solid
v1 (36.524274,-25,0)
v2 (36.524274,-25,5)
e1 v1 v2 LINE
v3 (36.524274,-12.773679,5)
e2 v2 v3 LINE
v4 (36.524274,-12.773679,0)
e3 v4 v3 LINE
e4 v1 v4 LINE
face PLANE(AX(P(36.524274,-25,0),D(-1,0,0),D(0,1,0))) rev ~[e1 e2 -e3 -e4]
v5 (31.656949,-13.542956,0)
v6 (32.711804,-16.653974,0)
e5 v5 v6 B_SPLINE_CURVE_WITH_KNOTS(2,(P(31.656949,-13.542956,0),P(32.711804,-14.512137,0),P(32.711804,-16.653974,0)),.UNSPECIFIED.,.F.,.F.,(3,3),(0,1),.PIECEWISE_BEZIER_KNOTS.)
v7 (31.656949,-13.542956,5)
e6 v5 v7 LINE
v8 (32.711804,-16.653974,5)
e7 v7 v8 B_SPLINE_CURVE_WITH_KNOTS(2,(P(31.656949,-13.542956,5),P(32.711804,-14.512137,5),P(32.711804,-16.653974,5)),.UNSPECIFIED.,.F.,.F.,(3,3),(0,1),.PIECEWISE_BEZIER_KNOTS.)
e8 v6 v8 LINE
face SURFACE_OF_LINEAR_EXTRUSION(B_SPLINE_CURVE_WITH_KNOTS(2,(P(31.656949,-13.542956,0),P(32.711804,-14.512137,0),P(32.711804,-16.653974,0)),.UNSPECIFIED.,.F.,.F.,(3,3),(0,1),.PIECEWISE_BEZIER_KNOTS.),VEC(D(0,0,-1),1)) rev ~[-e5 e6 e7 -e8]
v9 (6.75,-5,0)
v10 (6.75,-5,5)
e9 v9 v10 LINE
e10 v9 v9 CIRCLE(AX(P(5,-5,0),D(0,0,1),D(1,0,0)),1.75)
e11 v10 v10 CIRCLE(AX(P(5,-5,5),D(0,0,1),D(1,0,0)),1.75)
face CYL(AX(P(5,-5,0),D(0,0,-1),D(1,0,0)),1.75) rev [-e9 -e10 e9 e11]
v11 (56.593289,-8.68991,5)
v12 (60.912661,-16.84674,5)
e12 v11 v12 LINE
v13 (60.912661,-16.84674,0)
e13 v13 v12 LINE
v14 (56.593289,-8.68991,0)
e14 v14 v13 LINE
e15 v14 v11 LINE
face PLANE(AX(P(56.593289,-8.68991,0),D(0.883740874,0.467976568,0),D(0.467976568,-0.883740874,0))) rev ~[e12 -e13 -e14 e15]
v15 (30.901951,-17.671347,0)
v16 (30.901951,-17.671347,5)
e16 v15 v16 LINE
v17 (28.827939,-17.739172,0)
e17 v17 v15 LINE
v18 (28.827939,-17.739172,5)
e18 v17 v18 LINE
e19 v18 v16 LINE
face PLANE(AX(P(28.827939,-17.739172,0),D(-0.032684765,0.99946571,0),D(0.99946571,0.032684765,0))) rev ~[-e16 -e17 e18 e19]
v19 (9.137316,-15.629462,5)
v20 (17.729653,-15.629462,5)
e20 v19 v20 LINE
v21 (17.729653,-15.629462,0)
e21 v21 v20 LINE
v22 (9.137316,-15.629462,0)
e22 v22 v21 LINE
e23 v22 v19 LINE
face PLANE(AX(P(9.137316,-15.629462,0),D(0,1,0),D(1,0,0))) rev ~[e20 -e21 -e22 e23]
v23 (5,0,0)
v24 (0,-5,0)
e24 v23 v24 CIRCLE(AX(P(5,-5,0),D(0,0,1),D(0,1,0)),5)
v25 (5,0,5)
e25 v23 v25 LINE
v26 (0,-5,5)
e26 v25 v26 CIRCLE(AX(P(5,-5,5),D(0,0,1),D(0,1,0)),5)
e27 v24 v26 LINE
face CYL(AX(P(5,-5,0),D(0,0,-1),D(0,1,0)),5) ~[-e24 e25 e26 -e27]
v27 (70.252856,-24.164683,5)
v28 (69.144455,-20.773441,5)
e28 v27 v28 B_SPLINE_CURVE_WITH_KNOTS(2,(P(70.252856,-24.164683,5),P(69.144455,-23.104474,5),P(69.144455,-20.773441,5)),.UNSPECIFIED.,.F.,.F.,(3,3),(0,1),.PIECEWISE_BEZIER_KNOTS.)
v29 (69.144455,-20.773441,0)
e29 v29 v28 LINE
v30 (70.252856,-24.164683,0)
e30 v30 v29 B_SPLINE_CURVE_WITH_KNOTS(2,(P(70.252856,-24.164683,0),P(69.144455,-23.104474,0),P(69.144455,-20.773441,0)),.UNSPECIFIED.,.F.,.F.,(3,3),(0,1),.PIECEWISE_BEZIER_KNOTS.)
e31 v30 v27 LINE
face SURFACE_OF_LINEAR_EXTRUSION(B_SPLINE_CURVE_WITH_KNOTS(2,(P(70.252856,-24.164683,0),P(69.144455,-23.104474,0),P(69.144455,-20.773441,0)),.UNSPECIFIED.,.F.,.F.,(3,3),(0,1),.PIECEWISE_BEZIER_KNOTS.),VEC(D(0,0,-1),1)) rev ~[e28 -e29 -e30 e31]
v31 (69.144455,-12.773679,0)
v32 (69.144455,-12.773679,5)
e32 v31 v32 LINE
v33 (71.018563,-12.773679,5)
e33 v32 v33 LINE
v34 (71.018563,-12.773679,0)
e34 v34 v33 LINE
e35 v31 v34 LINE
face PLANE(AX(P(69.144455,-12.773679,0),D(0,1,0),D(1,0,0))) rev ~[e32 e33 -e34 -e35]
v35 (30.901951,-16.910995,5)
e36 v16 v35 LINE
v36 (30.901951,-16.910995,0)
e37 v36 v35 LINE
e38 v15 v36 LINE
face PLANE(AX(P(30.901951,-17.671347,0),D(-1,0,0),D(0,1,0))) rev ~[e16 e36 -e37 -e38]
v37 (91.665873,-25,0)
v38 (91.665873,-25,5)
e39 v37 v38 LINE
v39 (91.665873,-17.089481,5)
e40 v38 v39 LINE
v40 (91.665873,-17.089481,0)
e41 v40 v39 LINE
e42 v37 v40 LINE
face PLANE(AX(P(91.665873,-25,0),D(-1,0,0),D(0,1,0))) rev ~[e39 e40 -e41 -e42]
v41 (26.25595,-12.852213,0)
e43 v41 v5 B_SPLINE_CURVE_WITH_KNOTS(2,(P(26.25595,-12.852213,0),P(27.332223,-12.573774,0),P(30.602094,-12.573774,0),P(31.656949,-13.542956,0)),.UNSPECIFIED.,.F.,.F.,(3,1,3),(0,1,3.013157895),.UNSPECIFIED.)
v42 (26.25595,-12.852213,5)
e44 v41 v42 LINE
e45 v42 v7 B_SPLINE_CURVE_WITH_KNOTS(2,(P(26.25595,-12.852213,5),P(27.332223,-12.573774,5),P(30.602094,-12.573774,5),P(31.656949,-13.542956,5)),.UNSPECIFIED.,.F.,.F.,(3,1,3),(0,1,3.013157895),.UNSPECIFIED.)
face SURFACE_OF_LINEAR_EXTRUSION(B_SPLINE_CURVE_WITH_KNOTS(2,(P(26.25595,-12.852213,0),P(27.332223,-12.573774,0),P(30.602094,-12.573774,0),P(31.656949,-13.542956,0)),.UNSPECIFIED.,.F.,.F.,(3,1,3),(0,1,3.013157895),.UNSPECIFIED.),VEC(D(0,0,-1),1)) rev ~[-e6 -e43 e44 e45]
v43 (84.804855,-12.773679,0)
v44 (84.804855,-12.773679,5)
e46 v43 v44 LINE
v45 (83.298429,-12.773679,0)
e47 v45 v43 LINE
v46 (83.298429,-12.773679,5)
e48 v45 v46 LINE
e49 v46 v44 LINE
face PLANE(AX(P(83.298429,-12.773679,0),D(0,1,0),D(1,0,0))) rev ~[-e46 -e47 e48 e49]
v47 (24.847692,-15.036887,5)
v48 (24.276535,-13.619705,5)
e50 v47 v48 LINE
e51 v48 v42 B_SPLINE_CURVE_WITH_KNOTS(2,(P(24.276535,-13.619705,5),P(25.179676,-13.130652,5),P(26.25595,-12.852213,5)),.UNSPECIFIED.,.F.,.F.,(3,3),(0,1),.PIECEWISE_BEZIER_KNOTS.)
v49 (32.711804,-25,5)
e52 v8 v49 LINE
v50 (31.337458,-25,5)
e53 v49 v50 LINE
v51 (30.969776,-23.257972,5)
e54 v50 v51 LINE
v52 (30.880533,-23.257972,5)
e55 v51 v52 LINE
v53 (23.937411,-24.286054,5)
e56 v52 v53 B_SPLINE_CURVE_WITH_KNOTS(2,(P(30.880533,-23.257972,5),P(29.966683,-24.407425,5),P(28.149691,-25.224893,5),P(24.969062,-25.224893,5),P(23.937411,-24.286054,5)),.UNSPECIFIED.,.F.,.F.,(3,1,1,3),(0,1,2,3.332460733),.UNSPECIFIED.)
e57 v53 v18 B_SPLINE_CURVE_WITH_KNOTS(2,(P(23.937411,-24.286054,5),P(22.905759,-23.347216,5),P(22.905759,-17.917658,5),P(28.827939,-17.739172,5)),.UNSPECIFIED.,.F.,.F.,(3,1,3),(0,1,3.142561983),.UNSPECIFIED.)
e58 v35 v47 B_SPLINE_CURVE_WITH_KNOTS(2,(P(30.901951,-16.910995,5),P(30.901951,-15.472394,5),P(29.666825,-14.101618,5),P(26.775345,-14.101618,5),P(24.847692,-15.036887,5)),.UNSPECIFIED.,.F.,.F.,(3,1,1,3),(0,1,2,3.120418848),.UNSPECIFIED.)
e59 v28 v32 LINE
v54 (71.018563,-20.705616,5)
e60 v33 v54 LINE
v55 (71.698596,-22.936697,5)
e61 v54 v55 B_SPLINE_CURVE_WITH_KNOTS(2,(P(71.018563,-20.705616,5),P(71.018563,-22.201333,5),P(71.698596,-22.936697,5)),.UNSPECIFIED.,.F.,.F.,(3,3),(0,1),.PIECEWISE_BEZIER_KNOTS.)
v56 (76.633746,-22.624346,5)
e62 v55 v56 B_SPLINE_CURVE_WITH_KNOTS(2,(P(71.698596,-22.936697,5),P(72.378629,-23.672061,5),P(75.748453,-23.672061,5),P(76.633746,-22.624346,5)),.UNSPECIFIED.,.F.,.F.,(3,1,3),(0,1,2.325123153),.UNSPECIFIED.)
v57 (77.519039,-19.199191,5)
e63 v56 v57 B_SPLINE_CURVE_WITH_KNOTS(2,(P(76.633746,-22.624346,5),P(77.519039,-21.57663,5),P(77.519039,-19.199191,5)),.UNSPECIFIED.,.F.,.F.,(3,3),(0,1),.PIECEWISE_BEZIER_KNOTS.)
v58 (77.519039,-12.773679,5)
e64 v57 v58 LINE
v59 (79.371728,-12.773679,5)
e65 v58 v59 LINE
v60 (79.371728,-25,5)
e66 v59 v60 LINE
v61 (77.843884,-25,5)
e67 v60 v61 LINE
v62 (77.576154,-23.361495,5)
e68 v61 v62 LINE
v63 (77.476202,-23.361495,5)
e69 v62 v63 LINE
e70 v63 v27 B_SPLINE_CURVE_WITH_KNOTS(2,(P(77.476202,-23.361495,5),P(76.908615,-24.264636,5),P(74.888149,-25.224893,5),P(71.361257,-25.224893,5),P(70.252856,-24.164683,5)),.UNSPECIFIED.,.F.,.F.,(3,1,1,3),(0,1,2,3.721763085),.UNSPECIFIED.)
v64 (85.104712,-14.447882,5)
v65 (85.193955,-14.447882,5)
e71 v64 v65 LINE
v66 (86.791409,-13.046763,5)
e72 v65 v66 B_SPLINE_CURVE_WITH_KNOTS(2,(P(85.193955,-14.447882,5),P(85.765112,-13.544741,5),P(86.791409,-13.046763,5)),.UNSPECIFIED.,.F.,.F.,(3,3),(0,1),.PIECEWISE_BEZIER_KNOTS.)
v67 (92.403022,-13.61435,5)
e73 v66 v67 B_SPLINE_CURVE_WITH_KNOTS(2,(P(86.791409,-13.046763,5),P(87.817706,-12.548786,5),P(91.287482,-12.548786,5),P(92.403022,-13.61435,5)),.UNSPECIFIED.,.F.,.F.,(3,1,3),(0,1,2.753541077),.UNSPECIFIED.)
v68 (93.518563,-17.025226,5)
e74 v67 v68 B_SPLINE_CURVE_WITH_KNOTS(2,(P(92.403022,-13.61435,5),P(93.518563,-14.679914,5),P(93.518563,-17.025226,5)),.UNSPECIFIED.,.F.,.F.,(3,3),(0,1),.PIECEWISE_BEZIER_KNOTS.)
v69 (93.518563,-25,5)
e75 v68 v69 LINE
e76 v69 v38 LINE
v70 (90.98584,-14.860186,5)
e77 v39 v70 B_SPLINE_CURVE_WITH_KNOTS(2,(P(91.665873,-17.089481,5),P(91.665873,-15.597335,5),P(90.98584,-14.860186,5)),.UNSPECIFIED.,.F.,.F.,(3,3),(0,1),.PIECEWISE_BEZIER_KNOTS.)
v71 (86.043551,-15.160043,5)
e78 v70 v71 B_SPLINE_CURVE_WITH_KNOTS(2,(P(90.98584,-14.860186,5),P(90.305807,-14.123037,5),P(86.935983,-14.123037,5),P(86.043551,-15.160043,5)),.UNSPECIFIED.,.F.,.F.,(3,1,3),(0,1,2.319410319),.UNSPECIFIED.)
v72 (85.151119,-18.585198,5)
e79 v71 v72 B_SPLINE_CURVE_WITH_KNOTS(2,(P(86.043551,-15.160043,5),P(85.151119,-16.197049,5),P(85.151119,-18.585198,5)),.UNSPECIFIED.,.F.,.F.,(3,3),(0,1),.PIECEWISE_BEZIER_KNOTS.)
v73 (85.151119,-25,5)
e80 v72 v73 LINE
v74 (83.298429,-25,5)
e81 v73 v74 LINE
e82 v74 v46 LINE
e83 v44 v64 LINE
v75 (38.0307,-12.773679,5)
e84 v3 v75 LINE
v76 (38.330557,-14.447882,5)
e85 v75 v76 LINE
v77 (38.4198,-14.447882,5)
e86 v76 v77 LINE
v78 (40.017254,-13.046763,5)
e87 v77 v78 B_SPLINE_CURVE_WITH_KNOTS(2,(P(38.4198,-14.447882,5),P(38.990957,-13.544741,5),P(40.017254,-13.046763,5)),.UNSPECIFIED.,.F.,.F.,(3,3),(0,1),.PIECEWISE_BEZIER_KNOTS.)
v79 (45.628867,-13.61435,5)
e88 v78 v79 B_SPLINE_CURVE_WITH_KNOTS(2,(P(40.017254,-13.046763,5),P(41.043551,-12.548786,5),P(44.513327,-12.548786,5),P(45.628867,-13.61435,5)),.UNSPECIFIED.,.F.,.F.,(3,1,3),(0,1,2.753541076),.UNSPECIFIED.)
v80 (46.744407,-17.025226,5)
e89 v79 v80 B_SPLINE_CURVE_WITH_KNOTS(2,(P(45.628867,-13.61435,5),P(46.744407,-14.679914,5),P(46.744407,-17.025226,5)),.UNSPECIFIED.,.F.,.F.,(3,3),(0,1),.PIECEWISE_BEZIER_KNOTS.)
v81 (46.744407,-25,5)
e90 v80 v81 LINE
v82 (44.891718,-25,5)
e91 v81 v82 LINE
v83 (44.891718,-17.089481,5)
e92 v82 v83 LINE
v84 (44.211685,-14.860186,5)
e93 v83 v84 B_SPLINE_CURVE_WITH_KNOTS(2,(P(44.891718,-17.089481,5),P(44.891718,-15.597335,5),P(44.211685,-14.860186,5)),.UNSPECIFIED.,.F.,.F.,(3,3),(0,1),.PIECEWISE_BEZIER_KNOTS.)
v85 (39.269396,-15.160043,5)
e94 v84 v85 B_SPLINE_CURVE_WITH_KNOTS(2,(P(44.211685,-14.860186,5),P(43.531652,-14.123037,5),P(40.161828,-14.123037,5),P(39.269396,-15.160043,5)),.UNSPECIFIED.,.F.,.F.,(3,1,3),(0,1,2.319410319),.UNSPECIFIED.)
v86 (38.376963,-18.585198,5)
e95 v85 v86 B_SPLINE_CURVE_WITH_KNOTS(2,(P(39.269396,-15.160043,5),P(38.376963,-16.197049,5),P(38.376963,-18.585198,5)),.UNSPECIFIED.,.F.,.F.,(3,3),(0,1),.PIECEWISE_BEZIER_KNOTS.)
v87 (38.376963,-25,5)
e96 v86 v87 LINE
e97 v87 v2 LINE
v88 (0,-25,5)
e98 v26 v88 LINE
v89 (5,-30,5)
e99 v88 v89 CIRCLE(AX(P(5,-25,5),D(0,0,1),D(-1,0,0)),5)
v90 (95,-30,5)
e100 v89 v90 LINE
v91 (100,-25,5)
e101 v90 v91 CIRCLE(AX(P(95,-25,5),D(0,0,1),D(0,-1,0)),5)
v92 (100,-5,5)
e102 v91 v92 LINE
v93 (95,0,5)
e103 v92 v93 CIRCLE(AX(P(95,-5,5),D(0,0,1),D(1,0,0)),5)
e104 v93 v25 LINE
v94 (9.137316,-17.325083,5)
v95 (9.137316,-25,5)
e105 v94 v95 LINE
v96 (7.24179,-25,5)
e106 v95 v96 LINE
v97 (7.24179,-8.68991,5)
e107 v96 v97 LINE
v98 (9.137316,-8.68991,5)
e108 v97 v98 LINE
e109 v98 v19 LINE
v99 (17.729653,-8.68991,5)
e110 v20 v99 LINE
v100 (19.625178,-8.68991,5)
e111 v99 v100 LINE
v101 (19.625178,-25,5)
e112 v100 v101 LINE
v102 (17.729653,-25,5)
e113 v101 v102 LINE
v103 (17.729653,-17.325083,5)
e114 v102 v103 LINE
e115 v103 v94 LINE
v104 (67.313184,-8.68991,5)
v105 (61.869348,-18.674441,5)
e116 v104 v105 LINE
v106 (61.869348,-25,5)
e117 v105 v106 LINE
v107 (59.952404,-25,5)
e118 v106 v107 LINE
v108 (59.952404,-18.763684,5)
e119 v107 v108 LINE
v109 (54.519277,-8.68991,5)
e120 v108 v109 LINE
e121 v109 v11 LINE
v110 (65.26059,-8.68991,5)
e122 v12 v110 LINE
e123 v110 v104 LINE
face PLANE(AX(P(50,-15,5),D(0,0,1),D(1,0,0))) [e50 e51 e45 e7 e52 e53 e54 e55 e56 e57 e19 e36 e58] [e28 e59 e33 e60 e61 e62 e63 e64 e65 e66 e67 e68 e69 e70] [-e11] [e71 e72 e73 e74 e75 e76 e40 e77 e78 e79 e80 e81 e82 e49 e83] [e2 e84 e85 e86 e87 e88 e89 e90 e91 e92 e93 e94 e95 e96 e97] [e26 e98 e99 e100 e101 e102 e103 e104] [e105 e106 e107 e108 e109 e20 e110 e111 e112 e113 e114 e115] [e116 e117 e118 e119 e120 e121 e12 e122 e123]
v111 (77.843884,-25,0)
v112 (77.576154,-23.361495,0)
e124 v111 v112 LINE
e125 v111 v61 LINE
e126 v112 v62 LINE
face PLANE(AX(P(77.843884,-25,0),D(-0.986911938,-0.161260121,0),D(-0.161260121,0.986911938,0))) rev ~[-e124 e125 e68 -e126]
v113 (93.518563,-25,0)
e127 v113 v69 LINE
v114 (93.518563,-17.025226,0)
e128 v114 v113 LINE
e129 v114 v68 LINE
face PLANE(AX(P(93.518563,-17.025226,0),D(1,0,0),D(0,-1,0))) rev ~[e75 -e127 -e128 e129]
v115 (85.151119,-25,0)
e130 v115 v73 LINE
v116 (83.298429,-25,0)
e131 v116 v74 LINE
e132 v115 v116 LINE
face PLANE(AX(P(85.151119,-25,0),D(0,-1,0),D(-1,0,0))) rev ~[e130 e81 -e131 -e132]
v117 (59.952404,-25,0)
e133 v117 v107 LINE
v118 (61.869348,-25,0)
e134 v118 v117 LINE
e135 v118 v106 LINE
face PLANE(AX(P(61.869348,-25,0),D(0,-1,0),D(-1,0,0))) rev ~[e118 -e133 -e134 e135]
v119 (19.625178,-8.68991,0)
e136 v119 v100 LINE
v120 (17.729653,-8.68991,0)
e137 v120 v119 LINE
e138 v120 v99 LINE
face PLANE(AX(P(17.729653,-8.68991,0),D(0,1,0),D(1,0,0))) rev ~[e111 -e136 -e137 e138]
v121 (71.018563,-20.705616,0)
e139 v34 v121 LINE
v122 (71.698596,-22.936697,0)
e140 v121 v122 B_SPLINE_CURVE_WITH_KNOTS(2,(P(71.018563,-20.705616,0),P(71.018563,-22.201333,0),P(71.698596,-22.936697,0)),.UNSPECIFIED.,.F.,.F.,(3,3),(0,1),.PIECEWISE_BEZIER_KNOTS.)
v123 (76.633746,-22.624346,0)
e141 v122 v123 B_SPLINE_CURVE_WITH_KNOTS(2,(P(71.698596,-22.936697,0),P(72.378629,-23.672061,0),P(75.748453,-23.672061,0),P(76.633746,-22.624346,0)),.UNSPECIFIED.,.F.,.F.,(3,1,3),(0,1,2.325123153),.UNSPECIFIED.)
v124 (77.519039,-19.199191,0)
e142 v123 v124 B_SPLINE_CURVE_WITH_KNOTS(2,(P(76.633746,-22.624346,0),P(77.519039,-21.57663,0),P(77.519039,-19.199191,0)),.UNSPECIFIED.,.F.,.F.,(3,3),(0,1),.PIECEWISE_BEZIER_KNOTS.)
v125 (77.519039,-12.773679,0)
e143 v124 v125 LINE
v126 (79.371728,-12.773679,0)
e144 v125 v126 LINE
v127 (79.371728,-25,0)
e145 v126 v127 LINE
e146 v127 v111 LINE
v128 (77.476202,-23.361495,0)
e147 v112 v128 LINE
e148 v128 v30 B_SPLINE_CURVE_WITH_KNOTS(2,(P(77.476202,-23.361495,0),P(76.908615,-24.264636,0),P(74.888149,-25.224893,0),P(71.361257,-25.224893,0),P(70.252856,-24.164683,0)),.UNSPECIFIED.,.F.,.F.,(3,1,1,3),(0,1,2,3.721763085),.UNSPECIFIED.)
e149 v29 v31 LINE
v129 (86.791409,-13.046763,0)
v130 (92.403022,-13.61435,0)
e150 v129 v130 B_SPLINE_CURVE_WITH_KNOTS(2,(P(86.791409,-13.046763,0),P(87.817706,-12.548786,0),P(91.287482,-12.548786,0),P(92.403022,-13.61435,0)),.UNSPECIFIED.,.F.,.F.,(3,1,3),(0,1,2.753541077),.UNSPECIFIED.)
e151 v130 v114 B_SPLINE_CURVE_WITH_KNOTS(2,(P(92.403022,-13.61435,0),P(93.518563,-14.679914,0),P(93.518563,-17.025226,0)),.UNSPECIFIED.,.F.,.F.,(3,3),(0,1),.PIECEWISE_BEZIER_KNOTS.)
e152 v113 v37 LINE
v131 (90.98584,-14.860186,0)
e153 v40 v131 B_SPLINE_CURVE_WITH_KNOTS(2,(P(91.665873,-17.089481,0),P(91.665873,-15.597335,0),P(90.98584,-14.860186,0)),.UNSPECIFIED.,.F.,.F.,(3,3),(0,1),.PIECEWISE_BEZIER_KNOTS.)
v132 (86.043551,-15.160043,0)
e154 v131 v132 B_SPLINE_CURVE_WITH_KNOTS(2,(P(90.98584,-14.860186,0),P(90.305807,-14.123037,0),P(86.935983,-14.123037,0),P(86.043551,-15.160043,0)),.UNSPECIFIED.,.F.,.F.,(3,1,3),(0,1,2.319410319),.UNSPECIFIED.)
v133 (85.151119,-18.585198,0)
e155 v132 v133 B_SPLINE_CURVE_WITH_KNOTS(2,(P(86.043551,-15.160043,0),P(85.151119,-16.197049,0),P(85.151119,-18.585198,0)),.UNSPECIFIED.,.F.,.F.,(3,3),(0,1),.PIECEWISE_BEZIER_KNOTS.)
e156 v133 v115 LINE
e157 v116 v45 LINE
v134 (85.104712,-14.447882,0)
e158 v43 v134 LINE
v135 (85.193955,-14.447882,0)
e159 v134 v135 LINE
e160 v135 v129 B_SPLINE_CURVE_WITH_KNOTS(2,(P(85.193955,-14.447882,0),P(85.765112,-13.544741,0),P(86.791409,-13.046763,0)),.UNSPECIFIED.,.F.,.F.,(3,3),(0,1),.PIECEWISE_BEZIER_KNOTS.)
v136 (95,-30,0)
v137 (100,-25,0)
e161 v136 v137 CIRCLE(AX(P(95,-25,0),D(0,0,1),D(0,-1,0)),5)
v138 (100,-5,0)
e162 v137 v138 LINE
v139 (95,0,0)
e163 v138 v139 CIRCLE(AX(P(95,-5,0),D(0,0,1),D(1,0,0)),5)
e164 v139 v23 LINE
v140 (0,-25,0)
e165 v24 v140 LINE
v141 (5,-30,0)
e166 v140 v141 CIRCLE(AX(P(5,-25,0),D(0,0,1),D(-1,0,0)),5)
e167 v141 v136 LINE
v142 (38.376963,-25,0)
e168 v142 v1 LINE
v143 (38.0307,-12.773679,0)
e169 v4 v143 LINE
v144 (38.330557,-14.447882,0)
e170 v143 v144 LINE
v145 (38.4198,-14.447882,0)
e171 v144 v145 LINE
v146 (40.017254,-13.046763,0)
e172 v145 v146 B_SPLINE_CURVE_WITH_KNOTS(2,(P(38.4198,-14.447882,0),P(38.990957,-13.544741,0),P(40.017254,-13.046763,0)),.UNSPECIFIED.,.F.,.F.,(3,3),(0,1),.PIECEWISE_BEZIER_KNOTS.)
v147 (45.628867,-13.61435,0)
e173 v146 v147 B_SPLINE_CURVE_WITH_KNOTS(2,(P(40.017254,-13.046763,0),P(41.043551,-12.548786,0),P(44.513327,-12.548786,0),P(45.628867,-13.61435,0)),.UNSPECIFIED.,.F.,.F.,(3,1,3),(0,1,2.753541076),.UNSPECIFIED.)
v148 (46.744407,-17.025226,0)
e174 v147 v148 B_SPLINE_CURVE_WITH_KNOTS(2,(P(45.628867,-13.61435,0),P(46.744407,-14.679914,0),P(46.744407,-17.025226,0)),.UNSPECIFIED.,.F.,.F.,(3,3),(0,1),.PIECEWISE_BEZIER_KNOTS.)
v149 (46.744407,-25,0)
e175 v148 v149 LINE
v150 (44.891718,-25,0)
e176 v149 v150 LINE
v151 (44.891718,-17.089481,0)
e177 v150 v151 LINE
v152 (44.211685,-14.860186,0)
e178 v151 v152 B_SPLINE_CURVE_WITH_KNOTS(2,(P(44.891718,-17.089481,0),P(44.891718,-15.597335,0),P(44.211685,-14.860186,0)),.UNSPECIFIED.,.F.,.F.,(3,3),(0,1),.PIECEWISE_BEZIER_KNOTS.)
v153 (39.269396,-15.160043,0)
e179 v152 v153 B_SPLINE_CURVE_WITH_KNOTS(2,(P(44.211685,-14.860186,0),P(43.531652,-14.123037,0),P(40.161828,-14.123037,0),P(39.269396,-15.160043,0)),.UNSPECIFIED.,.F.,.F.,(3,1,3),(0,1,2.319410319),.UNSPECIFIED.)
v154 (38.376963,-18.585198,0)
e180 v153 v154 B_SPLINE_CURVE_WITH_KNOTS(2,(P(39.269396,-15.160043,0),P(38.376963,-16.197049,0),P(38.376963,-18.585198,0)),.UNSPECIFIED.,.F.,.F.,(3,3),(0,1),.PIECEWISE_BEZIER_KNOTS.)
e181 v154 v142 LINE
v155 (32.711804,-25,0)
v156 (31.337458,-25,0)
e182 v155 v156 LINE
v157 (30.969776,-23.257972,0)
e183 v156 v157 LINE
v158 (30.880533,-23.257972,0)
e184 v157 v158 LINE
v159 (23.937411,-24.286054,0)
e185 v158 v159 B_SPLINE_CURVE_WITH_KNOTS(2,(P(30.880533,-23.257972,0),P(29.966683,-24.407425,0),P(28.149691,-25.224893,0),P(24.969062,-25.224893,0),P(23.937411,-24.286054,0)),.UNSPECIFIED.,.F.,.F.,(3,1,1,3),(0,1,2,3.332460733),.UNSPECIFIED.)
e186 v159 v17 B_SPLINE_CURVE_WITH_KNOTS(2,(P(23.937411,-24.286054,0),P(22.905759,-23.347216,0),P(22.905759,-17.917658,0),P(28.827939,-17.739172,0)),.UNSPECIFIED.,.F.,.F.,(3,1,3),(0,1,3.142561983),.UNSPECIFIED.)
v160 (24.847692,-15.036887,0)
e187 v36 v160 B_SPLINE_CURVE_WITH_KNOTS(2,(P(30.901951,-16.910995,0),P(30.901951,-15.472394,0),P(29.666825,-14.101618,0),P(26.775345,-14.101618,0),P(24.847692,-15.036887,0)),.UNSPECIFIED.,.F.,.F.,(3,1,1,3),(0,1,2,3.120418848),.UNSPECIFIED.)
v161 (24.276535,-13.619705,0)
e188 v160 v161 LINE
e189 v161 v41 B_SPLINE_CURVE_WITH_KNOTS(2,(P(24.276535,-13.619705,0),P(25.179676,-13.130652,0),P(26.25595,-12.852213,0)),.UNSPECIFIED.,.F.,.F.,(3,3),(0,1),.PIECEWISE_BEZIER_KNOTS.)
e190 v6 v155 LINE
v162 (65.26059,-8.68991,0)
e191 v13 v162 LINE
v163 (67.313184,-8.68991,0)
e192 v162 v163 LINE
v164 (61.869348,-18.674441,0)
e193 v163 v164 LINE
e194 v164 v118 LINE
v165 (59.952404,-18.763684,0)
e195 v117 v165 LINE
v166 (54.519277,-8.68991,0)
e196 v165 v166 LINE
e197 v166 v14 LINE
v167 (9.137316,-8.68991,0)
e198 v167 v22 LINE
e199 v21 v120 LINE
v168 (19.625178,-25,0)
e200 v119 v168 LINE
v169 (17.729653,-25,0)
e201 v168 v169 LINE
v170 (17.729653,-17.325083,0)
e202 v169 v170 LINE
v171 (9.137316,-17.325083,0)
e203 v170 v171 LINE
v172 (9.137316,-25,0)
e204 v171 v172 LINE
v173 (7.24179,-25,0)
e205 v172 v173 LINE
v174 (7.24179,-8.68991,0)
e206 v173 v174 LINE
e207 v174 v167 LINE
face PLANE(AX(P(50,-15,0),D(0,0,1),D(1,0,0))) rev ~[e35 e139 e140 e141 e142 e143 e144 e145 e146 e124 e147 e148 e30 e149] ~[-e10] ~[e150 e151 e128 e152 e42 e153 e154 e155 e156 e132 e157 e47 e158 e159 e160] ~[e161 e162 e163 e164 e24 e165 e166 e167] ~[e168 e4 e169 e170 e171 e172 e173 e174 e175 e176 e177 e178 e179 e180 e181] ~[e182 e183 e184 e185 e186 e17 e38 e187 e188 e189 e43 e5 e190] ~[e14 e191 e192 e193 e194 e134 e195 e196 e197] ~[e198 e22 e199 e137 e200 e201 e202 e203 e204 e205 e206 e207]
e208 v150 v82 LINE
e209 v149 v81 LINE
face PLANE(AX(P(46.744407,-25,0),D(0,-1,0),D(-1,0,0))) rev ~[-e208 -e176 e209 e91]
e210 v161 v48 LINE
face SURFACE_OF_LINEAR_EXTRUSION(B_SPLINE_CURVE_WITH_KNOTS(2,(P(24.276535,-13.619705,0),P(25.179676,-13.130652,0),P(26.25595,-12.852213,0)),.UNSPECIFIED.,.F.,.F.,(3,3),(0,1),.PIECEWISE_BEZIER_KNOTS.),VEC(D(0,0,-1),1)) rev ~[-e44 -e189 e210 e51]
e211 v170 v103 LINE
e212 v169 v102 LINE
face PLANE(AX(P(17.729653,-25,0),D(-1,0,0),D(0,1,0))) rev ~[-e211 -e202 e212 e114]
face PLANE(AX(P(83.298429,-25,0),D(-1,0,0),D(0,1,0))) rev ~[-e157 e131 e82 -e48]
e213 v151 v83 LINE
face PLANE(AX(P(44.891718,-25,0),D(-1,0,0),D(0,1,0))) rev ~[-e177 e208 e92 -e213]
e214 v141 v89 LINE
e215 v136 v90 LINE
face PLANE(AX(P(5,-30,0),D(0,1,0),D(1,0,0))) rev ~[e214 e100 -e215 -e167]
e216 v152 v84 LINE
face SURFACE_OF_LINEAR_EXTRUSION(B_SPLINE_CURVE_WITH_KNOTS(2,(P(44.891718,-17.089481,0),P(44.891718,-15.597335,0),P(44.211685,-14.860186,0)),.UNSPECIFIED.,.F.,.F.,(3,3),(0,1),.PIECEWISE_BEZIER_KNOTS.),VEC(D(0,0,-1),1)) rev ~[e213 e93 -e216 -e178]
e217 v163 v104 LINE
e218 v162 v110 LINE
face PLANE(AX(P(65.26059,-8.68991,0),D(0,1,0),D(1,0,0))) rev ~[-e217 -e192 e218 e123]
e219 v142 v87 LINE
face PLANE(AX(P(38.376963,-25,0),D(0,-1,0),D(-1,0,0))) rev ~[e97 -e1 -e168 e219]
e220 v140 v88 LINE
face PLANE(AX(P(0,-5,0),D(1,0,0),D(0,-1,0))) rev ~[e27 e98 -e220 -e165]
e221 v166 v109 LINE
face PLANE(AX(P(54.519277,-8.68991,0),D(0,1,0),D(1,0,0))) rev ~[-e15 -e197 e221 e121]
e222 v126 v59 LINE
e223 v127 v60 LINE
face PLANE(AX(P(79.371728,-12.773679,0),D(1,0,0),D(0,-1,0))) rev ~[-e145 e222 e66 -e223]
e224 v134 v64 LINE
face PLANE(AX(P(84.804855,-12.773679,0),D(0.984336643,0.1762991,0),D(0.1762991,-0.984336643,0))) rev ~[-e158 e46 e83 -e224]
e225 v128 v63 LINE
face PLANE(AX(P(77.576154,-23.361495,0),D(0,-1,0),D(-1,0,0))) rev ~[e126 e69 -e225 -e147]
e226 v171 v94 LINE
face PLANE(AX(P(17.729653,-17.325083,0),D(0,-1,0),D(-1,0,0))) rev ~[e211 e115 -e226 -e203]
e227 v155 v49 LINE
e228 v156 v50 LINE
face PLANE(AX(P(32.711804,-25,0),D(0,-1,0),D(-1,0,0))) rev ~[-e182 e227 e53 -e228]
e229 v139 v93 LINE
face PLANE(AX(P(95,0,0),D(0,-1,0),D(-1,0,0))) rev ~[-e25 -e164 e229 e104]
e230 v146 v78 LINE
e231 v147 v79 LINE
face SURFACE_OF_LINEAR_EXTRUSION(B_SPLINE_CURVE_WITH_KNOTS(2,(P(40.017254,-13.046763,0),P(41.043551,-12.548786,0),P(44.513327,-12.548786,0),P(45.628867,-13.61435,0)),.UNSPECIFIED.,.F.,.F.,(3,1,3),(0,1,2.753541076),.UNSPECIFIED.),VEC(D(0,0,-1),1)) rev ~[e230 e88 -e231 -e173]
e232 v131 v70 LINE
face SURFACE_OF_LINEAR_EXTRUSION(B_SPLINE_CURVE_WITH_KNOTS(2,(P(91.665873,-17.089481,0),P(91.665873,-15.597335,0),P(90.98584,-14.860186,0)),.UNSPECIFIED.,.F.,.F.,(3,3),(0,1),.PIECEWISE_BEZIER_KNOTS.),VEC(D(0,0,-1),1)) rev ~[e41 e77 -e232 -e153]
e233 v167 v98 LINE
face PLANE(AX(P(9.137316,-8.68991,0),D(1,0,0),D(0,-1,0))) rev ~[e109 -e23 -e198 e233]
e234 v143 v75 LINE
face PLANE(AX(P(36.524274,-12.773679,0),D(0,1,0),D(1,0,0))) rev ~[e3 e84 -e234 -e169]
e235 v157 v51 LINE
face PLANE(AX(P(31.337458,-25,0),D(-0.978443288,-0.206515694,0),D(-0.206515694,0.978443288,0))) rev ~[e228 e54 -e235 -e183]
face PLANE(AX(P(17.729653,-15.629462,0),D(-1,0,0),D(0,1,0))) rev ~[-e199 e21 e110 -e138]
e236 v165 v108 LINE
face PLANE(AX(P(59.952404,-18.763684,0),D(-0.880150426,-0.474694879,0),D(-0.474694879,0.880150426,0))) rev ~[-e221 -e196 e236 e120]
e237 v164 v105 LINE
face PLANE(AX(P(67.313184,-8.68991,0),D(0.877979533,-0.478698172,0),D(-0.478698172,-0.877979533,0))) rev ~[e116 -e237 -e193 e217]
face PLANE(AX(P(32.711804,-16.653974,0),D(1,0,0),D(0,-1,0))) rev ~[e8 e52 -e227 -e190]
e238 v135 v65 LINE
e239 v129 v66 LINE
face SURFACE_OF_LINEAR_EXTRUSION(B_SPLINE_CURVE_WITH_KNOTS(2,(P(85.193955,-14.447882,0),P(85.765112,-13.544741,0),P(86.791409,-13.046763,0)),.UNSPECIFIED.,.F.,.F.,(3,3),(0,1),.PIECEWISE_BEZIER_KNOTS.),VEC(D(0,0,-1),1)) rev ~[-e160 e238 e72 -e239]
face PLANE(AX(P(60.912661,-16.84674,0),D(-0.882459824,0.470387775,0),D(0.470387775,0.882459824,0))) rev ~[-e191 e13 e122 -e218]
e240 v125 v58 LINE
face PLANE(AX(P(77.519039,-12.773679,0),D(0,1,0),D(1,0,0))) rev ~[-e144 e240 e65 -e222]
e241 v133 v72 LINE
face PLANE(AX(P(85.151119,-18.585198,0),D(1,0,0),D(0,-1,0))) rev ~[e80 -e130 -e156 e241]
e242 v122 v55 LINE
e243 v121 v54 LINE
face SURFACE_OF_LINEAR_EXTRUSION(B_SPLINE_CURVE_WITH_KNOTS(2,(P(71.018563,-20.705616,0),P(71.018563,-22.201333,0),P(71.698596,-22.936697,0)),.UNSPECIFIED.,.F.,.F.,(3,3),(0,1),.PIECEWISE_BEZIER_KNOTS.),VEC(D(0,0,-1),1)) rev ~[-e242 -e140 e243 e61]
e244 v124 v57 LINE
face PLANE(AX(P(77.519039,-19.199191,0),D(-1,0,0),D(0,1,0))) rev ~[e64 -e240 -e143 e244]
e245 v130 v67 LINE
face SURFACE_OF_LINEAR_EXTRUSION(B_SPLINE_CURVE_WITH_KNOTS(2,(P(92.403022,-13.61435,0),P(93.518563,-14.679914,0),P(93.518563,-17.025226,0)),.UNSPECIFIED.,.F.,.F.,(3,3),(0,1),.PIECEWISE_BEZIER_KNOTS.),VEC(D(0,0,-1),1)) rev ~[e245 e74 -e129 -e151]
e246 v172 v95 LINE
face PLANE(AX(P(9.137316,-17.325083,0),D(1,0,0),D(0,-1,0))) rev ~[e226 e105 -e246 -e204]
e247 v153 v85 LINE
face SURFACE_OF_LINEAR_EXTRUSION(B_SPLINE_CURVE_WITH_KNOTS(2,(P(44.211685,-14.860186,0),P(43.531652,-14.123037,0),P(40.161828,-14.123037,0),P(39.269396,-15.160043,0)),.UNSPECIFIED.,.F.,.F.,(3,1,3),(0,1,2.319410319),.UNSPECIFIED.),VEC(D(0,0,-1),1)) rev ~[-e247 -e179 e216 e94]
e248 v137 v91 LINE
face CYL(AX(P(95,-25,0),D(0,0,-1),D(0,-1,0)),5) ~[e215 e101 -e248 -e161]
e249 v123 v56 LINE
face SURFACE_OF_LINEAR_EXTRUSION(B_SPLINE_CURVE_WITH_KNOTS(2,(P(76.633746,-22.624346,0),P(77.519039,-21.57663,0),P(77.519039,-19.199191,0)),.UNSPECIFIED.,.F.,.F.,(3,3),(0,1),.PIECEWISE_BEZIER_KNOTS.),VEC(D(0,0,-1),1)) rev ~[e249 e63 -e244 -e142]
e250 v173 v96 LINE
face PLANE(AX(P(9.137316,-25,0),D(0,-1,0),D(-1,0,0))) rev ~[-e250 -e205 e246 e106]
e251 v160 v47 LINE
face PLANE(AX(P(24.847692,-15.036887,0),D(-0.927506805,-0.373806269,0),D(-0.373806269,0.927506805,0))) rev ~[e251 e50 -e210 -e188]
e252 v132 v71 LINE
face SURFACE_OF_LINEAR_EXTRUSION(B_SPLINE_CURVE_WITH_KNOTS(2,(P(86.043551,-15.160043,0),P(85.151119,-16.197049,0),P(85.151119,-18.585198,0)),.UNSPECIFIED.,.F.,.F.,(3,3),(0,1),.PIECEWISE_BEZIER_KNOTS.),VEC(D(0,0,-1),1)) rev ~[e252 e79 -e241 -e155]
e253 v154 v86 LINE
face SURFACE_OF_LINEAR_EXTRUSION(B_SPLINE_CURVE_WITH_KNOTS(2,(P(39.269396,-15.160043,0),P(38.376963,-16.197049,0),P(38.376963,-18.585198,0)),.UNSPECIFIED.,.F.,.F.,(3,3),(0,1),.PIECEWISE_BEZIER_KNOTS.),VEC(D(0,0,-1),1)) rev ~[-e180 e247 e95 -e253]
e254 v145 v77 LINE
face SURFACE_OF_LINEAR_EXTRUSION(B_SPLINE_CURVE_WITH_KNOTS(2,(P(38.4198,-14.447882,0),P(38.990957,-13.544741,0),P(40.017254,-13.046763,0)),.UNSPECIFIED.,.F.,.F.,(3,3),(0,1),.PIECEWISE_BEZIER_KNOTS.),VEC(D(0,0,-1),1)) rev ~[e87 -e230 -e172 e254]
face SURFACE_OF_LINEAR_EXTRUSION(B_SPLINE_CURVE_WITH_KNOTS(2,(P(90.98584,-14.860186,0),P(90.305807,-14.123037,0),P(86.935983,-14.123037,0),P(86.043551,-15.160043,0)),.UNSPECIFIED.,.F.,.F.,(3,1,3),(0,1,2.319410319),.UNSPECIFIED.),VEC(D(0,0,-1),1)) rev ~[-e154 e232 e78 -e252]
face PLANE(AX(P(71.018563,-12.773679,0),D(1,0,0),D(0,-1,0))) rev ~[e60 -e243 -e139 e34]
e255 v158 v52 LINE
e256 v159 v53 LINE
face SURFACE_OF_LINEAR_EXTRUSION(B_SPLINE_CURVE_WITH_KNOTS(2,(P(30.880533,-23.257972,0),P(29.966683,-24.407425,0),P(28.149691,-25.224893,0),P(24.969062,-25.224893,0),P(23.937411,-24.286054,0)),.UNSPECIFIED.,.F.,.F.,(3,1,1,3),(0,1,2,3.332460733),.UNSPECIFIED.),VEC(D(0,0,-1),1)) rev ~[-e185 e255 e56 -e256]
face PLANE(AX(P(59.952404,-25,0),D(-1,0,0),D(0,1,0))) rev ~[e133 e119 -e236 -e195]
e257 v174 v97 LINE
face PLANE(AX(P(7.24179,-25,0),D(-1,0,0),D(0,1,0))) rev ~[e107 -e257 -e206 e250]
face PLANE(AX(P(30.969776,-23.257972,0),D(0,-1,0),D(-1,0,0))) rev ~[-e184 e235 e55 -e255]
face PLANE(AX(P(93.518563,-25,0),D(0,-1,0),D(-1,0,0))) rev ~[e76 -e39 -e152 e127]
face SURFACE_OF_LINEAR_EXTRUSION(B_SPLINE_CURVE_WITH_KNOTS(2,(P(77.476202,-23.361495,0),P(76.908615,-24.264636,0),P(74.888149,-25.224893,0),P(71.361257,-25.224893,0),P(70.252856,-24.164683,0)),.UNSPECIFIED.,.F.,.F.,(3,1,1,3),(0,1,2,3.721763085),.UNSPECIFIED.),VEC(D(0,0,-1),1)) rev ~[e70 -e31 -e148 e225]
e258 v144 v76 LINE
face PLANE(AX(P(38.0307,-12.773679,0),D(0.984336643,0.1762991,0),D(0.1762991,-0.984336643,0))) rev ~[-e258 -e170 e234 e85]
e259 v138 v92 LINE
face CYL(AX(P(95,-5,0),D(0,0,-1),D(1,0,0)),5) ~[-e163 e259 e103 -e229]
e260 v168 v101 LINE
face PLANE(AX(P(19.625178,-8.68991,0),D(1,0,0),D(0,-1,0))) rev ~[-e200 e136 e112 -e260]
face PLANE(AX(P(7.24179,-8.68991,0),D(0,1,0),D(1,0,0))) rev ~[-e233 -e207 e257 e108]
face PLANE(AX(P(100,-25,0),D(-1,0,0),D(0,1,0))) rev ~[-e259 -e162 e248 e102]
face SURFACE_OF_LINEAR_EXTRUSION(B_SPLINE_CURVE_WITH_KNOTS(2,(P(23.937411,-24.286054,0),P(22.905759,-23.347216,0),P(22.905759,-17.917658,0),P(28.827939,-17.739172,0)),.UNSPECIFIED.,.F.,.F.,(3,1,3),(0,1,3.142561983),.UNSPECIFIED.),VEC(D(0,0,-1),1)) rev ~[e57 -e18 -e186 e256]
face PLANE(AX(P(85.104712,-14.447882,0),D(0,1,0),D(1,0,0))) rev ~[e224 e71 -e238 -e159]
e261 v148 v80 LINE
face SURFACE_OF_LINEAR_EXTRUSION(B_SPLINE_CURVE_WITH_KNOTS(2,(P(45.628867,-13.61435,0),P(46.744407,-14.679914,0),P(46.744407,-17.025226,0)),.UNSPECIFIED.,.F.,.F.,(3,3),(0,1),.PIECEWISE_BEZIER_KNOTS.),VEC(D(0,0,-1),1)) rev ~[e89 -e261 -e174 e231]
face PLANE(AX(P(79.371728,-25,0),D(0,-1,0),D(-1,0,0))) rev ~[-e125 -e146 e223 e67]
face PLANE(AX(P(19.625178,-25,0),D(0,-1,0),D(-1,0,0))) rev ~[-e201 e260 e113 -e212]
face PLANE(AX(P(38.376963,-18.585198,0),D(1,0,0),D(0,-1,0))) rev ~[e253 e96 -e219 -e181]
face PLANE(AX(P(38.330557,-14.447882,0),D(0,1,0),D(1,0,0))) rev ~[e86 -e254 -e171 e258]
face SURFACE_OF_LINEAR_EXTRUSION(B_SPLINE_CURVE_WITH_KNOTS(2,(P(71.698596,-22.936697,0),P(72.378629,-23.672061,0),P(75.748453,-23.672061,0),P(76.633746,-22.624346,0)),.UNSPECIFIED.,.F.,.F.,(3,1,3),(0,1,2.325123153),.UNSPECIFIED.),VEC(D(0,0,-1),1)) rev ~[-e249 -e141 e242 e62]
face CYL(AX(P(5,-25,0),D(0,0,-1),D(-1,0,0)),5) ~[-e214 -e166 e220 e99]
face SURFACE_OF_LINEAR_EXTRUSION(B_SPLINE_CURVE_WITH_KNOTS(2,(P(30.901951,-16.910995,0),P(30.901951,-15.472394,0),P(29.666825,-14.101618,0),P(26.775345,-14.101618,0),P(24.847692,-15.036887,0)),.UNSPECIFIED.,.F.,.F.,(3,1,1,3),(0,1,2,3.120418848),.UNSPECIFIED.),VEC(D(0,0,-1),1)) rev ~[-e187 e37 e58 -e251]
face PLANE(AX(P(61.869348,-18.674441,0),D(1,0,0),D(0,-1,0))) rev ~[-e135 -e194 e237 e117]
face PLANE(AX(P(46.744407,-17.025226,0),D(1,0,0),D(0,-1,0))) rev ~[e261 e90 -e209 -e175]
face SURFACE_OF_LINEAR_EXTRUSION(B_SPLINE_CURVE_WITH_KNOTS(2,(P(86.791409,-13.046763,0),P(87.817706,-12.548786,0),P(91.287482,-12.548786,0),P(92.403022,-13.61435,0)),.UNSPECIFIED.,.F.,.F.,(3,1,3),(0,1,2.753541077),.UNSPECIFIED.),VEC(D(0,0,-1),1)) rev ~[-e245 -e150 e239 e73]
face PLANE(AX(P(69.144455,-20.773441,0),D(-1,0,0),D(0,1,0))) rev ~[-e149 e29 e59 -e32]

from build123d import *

# Parameters (mm, degrees)
F0_R     = 1.75
F1_DEPTH = 5


with BuildPart() as f1:
    # F0 (on Top) → F1 (new body)
    with BuildSketch(Plane.XY):
        with BuildLine():
            Line((95, 0), (5, 0))
            ThreePointArc((5, 0), (1.4644660941, -1.4644660941), (0, -5))
            Line((0, -5), (0, -25))
            ThreePointArc((0, -25), (1.4644660941, -28.5355339059), (5, -30))
            Line((5, -30), (95, -30))
            ThreePointArc((95, -30), (98.5355339059, -28.5355339059), (100, -25))
            Line((100, -25), (100, -5))
            ThreePointArc((100, -5), (98.5355339059, -1.4644660941), (95, 0))
        make_face()
        Polygon((19.6251784864, -8.6899095669), (19.6251784864, -25), (17.7296525464, -25), (17.7296525464, -17.3250832937), (9.137315564, -17.3250832937), (9.137315564, -25), (7.241789624, -25), (7.241789624, -8.6899095669), (9.137315564, -8.6899095669), (9.137315564, -15.6294621609), (17.7296525464, -15.6294621609), (17.7296525464, -8.6899095669), align=None, mode=Mode.SUBTRACT)
        with BuildLine():
            Line((32.7118039029, -25), (31.3374583532, -25))
            Line((31.3374583532, -25), (30.969776297, -23.2579723941))
            Line((30.969776297, -23.2579723941), (30.8805330795, -23.2579723941))
            add(Edge.make_bspline(
                [(30.8805330795, -23.2579723941), (29.9666825321, -24.4074250357), (29.0581865778, -24.8161589719)],
                knots=[0, 0, 0, 1, 1, 1], degree=2))
            add(Edge.make_bspline(
                [(29.0581865778, -24.8161589719), (28.1496906235, -25.2248929081), (26.7860542599, -25.2248929081)],
                knots=[0, 0, 0, 1, 1, 1], degree=2))
            add(Edge.make_bspline(
                [(26.7860542599, -25.2248929081), (24.9690623513, -25.2248929081), (23.9374107568, -24.2860542599)],
                knots=[0, 0, 0, 1, 1, 1], degree=2))
            add(Edge.make_bspline(
                [(23.9374107568, -24.2860542599), (22.9057591623, -23.3472156116), (22.9057591623, -21.6194669205)],
                knots=[0, 0, 0, 1, 1, 1], degree=2))
            add(Edge.make_bspline(
                [(22.9057591623, -21.6194669205), (22.9057591623, -17.917658258), (28.8279390766, -17.7391718229)],
                knots=[0, 0, 0, 1, 1, 1], degree=2))
            Line((28.8279390766, -17.7391718229), (30.9019514517, -17.6713469776))
            Line((30.9019514517, -17.6713469776), (30.9019514517, -16.9109947644))
            add(Edge.make_bspline(
                [(30.9019514517, -16.9109947644), (30.9019514517, -15.472394098), (30.2843883865, -14.7870061875)],
                knots=[0, 0, 0, 1, 1, 1], degree=2))
            add(Edge.make_bspline(
                [(30.2843883865, -14.7870061875), (29.6668253213, -14.101618277), (28.3031889576, -14.101618277)],
                knots=[0, 0, 0, 1, 1, 1], degree=2))
            add(Edge.make_bspline(
                [(28.3031889576, -14.101618277), (26.7753450738, -14.101618277), (24.8476915754, -15.0368871966)],
                knots=[0, 0, 0, 1, 1, 1], degree=2))
            Line((24.8476915754, -15.0368871966), (24.2765349833, -13.6197049024))
            add(Edge.make_bspline(
                [(24.2765349833, -13.6197049024), (25.1796763446, -13.1306520704), (26.2559495478, -12.8522132318)],
                knots=[0, 0, 0, 1, 1, 1], degree=2))
            add(Edge.make_bspline(
                [(26.2559495478, -12.8522132318), (27.3322227511, -12.5737743931), (28.4174202761, -12.5737743931)],
                knots=[0, 0, 0, 1, 1, 1], degree=2))
            add(Edge.make_bspline(
                [(28.4174202761, -12.5737743931), (30.6020942408, -12.5737743931), (31.6569490719, -13.5429557354)],
                knots=[0, 0, 0, 1, 1, 1], degree=2))
            add(Edge.make_bspline(
                [(31.6569490719, -13.5429557354), (32.7118039029, -14.5121370776), (32.7118039029, -16.653974298)],
                knots=[0, 0, 0, 1, 1, 1], degree=2))
            Line((32.7118039029, -16.653974298), (32.7118039029, -25))
        make_face(mode=Mode.SUBTRACT)
        with BuildLine():
            Line((46.744407425, -25), (44.8917182294, -25))
            Line((44.8917182294, -25), (44.8917182294, -17.0894811994))
            add(Edge.make_bspline(
                [(44.8917182294, -17.0894811994), (44.8917182294, -15.5973346026), (44.2116849119, -14.8601856259)],
                knots=[0, 0, 0, 1, 1, 1], degree=2))
            add(Edge.make_bspline(
                [(44.2116849119, -14.8601856259), (43.5316515945, -14.1230366492), (42.0787720133, -14.1230366492)],
                knots=[0, 0, 0, 1, 1, 1], degree=2))
            add(Edge.make_bspline(
                [(42.0787720133, -14.1230366492), (40.1618277011, -14.1230366492), (39.2693955259, -15.1600428367)],
                knots=[0, 0, 0, 1, 1, 1], degree=2))
            add(Edge.make_bspline(
                [(39.2693955259, -15.1600428367), (38.3769633508, -16.1970490243), (38.3769633508, -18.585197525)],
                knots=[0, 0, 0, 1, 1, 1], degree=2))
            Line((38.3769633508, -18.585197525), (38.3769633508, -25))
            Line((38.3769633508, -25), (36.5242741552, -25))
            Line((36.5242741552, -25), (36.5242741552, -12.7736792004))
            Line((36.5242741552, -12.7736792004), (38.0306996668, -12.7736792004))
            Line((38.0306996668, -12.7736792004), (38.3305568777, -14.447881961))
            Line((38.3305568777, -14.447881961), (38.4198000952, -14.447881961))
            add(Edge.make_bspline(
                [(38.4198000952, -14.447881961), (38.9909566873, -13.5447405997), (40.0172536887, -13.046763446)],
                knots=[0, 0, 0, 1, 1, 1], degree=2))
            add(Edge.make_bspline(
                [(40.0172536887, -13.046763446), (41.0435506901, -12.5487862922), (42.3036649215, -12.5487862922)],
                knots=[0, 0, 0, 1, 1, 1], degree=2))
            add(Edge.make_bspline(
                [(42.3036649215, -12.5487862922), (44.5133269871, -12.5487862922), (45.6288672061, -13.6143503094)],
                knots=[0, 0, 0, 1, 1, 1], degree=2))
            add(Edge.make_bspline(
                [(45.6288672061, -13.6143503094), (46.744407425, -14.6799143265), (46.744407425, -17.0252260828)],
                knots=[0, 0, 0, 1, 1, 1], degree=2))
            Line((46.744407425, -17.0252260828), (46.744407425, -25))
        make_face(mode=Mode.SUBTRACT)
        with BuildLine():
            Line((69.1444550214, -12.7736792004), (71.0185625892, -12.7736792004))
            Line((71.0185625892, -12.7736792004), (71.0185625892, -20.7056163732))
            add(Edge.make_bspline(
                [(71.0185625892, -20.7056163732), (71.0185625892, -22.2013326987), (71.6985959067, -22.936696811)],
                knots=[0, 0, 0, 1, 1, 1], degree=2))
            add(Edge.make_bspline(
                [(71.6985959067, -22.936696811), (72.3786292242, -23.6720609234), (73.8279390766, -23.6720609234)],
                knots=[0, 0, 0, 1, 1, 1], degree=2))
            add(Edge.make_bspline(
                [(73.8279390766, -23.6720609234), (75.7484531176, -23.6720609234), (76.6337458353, -22.6243455497)],
                knots=[0, 0, 0, 1, 1, 1], degree=2))
            add(Edge.make_bspline(
                [(76.6337458353, -22.6243455497), (77.5190385531, -21.5766301761), (77.5190385531, -19.1991908615)],
                knots=[0, 0, 0, 1, 1, 1], degree=2))
            Line((77.5190385531, -19.1991908615), (77.5190385531, -12.7736792004))
            Line((77.5190385531, -12.7736792004), (79.3717277487, -12.7736792004))
            Line((79.3717277487, -12.7736792004), (79.3717277487, -25))
            Line((79.3717277487, -25), (77.8438838648, -25))
            Line((77.8438838648, -25), (77.5761542123, -23.3614945264))
            Line((77.5761542123, -23.3614945264), (77.4762018087, -23.3614945264))
            add(Edge.make_bspline(
                [(77.4762018087, -23.3614945264), (76.9086149453, -24.2646358877), (75.898381723, -24.7447643979)],
                knots=[0, 0, 0, 1, 1, 1], degree=2))
            add(Edge.make_bspline(
                [(75.898381723, -24.7447643979), (74.8881485007, -25.2248929081), (73.5923369824, -25.2248929081)],
                knots=[0, 0, 0, 1, 1, 1], degree=2))
            add(Edge.make_bspline(
                [(73.5923369824, -25.2248929081), (71.3612565445, -25.2248929081), (70.252855783, -24.1646834841)],
                knots=[0, 0, 0, 1, 1, 1], degree=2))
            add(Edge.make_bspline(
                [(70.252855783, -24.1646834841), (69.1444550214, -23.10447406), (69.1444550214, -20.7734412185)],
                knots=[0, 0, 0, 1, 1, 1], degree=2))
            Line((69.1444550214, -20.7734412185), (69.1444550214, -12.7736792004))
        make_face(mode=Mode.SUBTRACT)
        Polygon((56.59328891, -8.6899095669), (60.9126606378, -16.8467396478), (65.2605901951, -8.6899095669), (67.313184198, -8.6899095669), (61.8693479296, -18.6744407425), (61.8693479296, -25), (59.9524036173, -25), (59.9524036173, -18.76368396), (54.519276535, -8.6899095669), align=None, mode=Mode.SUBTRACT)
        with BuildLine():
            Line((93.5185625892, -25), (91.6658733936, -25))
            Line((91.6658733936, -25), (91.6658733936, -17.0894811994))
            add(Edge.make_bspline(
                [(91.6658733936, -17.0894811994), (91.6658733936, -15.5973346026), (90.9858400762, -14.8601856259)],
                knots=[0, 0, 0, 1, 1, 1], degree=2))
            add(Edge.make_bspline(
                [(90.9858400762, -14.8601856259), (90.3058067587, -14.1230366492), (88.8529271775, -14.1230366492)],
                knots=[0, 0, 0, 1, 1, 1], degree=2))
            add(Edge.make_bspline(
                [(88.8529271775, -14.1230366492), (86.9359828653, -14.1230366492), (86.0435506901, -15.1600428367)],
                knots=[0, 0, 0, 1, 1, 1], degree=2))
            add(Edge.make_bspline(
                [(86.0435506901, -15.1600428367), (85.151118515, -16.1970490243), (85.151118515, -18.585197525)],
                knots=[0, 0, 0, 1, 1, 1], degree=2))
            Line((85.151118515, -18.585197525), (85.151118515, -25))
            Line((85.151118515, -25), (83.2984293194, -25))
            Line((83.2984293194, -25), (83.2984293194, -12.7736792004))
            Line((83.2984293194, -12.7736792004), (84.804854831, -12.7736792004))
            Line((84.804854831, -12.7736792004), (85.1047120419, -14.447881961))
            Line((85.1047120419, -14.447881961), (85.1939552594, -14.447881961))
            add(Edge.make_bspline(
                [(85.1939552594, -14.447881961), (85.7651118515, -13.5447405997), (86.7914088529, -13.046763446)],
                knots=[0, 0, 0, 1, 1, 1], degree=2))
            add(Edge.make_bspline(
                [(86.7914088529, -13.046763446), (87.8177058544, -12.5487862922), (89.0778200857, -12.5487862922)],
                knots=[0, 0, 0, 1, 1, 1], degree=2))
            add(Edge.make_bspline(
                [(89.0778200857, -12.5487862922), (91.2874821514, -12.5487862922), (92.4030223703, -13.6143503094)],
                knots=[0, 0, 0, 1, 1, 1], degree=2))
            add(Edge.make_bspline(
                [(92.4030223703, -13.6143503094), (93.5185625892, -14.6799143265), (93.5185625892, -17.0252260828)],
                knots=[0, 0, 0, 1, 1, 1], degree=2))
            Line((93.5185625892, -17.0252260828), (93.5185625892, -25))
        make_face(mode=Mode.SUBTRACT)
        with Locations((5, -5)):
            Circle(F0_R, mode=Mode.SUBTRACT)
    extrude(amount=F1_DEPTH)


solid = f1.part
